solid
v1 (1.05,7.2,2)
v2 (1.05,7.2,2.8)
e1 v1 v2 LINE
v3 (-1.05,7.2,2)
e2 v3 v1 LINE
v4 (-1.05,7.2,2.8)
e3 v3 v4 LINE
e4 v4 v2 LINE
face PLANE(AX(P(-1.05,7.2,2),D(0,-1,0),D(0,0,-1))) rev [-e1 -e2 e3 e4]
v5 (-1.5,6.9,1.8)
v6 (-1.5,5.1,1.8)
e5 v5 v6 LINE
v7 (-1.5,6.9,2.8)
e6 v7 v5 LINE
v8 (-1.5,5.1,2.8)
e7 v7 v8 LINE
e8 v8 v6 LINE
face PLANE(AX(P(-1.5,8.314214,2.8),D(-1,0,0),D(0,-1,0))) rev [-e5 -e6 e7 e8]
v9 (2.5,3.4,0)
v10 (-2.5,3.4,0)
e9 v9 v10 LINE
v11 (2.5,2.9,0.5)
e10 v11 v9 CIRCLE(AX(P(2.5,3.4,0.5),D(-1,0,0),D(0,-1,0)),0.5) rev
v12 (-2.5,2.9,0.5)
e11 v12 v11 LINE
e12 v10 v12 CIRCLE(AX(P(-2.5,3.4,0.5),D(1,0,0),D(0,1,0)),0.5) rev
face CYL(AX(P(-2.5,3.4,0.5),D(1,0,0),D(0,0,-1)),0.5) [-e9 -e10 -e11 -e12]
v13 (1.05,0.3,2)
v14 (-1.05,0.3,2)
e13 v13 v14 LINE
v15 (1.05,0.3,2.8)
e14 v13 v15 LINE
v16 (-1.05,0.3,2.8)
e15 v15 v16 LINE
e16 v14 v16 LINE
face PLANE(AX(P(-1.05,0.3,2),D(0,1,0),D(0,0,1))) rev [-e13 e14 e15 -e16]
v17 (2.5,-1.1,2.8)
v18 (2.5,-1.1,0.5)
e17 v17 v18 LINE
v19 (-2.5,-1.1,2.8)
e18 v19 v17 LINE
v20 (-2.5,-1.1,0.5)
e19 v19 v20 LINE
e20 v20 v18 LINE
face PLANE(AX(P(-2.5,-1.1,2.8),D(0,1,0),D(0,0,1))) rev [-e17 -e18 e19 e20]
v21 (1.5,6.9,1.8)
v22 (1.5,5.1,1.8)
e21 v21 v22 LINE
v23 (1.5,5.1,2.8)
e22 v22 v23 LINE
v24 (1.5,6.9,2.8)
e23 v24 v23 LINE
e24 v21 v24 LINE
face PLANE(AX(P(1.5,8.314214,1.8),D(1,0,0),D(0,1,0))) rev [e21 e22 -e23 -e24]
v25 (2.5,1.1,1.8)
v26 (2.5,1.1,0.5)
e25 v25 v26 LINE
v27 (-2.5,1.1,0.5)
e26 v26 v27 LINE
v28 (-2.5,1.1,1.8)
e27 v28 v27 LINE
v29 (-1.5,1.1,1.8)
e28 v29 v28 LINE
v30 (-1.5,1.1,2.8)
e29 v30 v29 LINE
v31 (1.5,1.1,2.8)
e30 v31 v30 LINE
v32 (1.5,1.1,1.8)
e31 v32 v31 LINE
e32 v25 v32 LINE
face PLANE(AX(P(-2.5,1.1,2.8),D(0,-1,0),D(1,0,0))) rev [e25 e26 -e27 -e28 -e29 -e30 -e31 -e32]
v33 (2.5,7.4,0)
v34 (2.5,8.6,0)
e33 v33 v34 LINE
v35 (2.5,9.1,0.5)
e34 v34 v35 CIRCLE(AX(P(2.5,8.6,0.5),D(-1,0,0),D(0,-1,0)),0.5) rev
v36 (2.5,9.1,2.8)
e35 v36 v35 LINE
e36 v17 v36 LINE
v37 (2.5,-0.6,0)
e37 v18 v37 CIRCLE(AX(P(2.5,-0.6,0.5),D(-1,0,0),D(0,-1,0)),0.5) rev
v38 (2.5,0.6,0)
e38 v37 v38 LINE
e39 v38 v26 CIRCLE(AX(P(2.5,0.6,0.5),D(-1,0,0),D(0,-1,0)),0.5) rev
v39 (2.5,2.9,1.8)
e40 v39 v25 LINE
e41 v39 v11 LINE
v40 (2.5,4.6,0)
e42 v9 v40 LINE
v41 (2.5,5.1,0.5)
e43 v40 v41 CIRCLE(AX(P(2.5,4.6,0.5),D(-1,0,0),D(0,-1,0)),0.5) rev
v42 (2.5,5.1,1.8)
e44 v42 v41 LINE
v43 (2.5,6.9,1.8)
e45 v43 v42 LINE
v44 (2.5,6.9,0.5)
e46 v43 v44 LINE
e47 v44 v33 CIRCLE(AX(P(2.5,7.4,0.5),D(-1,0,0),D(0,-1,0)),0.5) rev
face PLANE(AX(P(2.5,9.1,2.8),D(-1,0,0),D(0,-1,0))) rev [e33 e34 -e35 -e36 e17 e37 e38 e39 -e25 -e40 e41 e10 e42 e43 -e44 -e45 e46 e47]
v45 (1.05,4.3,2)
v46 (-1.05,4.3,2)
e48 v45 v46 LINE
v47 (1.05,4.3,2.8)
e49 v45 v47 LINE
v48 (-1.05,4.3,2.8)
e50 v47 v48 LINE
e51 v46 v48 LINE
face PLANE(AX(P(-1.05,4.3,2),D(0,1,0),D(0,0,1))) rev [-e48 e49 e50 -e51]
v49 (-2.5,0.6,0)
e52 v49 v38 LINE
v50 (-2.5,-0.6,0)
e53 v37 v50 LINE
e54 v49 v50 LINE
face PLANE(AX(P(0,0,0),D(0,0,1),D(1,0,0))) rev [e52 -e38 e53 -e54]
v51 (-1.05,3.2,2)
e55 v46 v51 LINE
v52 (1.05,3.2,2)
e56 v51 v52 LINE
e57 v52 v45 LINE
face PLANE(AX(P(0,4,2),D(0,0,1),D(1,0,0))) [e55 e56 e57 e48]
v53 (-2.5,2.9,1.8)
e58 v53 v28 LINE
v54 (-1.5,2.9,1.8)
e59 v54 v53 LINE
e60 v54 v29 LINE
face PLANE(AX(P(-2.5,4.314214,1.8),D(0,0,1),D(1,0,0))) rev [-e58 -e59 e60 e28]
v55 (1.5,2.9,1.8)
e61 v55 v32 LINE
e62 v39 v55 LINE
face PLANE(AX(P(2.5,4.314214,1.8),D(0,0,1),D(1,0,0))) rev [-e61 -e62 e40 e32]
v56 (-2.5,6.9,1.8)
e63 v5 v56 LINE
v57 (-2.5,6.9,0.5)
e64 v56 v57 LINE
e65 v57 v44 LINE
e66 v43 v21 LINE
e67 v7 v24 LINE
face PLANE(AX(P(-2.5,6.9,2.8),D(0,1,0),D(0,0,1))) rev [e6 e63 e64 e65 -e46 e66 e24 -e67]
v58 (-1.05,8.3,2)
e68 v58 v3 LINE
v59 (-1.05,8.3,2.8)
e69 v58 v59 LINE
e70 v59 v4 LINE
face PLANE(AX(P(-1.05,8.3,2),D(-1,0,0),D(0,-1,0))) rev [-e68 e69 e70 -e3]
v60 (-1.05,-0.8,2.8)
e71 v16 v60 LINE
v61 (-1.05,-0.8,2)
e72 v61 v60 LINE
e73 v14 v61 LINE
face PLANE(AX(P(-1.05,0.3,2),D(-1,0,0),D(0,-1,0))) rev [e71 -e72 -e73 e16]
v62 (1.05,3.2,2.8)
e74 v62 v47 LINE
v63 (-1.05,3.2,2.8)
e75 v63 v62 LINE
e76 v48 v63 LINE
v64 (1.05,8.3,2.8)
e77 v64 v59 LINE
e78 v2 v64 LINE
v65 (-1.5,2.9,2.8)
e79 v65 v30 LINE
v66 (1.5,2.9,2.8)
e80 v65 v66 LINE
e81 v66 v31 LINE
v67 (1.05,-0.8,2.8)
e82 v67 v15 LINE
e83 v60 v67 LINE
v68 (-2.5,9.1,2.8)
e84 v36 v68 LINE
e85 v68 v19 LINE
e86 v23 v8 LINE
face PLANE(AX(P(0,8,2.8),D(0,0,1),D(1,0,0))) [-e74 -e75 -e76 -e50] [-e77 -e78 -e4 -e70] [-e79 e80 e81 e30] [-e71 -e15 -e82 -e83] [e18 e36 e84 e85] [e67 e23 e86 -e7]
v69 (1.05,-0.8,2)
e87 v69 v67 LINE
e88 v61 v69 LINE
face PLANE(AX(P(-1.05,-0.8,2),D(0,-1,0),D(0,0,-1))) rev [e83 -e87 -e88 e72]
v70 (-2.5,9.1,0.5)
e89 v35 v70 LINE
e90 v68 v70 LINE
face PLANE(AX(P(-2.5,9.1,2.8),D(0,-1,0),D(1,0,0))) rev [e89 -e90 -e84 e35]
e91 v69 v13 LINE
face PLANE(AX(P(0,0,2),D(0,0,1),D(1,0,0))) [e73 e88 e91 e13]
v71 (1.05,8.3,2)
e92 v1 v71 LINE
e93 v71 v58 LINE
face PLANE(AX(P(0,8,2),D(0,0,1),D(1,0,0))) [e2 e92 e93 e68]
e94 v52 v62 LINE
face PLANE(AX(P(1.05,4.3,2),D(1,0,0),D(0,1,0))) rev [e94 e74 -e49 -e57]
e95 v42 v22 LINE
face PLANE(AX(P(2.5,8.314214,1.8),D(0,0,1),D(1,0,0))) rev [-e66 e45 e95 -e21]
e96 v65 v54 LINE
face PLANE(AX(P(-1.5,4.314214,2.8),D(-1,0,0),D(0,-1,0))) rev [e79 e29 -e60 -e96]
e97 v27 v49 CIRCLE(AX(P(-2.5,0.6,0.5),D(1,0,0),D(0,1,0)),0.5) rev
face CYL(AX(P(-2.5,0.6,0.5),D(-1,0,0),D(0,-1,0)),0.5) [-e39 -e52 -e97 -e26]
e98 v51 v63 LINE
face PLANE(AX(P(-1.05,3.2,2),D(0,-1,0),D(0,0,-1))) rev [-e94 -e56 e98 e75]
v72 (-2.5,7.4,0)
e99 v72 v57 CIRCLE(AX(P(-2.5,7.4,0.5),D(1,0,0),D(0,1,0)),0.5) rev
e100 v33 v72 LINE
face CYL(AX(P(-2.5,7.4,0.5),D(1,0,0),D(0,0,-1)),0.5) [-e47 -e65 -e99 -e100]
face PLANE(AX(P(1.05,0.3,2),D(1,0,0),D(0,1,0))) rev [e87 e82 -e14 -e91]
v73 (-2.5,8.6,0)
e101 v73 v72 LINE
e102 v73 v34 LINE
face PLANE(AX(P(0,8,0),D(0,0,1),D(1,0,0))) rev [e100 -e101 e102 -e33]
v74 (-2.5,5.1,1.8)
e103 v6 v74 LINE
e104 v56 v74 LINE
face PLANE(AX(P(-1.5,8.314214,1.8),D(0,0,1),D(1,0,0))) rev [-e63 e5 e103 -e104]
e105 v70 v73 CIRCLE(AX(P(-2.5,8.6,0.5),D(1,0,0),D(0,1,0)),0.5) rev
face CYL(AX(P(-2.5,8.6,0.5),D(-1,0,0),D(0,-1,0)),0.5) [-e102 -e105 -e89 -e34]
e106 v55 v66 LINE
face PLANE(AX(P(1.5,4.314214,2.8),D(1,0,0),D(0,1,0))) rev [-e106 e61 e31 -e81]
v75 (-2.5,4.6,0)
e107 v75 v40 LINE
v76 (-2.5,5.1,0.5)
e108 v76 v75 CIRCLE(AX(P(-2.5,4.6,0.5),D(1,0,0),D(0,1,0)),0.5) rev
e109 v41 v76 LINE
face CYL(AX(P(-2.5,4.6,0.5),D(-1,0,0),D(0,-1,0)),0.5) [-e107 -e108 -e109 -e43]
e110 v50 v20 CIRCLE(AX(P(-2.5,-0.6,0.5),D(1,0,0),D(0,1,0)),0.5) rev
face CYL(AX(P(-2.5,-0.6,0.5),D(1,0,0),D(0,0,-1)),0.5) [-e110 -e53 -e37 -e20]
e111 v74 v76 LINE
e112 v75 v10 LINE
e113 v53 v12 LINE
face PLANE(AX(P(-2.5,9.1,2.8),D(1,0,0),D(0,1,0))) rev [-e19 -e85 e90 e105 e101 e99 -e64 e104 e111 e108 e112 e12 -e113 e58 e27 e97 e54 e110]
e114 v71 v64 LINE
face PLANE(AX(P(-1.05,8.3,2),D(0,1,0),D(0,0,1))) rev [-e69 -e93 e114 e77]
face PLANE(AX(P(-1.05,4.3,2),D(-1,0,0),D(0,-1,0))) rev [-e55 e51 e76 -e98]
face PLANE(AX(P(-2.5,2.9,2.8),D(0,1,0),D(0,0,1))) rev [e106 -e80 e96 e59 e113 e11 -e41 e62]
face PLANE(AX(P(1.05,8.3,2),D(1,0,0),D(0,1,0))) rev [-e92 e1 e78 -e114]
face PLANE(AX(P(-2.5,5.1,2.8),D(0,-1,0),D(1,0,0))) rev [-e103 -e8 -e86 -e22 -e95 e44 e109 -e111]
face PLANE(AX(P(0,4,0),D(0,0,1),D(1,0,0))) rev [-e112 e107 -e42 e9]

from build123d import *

# Parameters (mm, degrees)
SKETCH_1_W              = 5
SKETCH_1_H              = 2.2
EXTRUDE_1_DEPTH         = 2.8
SKETCH_2_W              = 2.1
SKETCH_2_H              = 1.1
CUT_EXTRUDE_1_DEPTH     = 0.8
FILLET_1_R              = 0.5
MOVE_START              = -2.5
MOVE_BODY_1_DEPTH       = 5
MOVE_BODY_1_2_OUTLINE_W = 1.1
MOVE_BODY_1_2_OUTLINE_H = 0.8
MOVE_BODY_1_2_DEPTH     = 1.45
MOVE_START_2            = 1.05
MOVE_BODY_1_3_OUTLINE_W = 1.1
MOVE_BODY_1_3_OUTLINE_H = 0.8
MOVE_BODY_1_3_DEPTH     = 1.45
MOVE_BODY_1_4_DEPTH     = 5
MOVE_BODY_1_5_OUTLINE_W = 1.1
MOVE_BODY_1_5_OUTLINE_H = 0.8
MOVE_BODY_1_5_DEPTH     = 1.45
MOVE_BODY_1_6_OUTLINE_W = 1.1
MOVE_BODY_1_6_OUTLINE_H = 0.8
MOVE_BODY_1_6_DEPTH     = 1.45
SKETCH_3_W              = 1
SKETCH_3_H              = 1
EXTRUDE_2_DEPTH         = 1.8
SKETCH_4_W              = 1
SKETCH_4_H              = 1
EXTRUDE_3_DEPTH         = 1.8


# Read off the part's stored shape, not the designer's step: 实体-移动/复制1
with BuildPart() as part:
    # 草图1 → 凸台-拉伸1 (new body)
    with BuildSketch(Plane.XY):
        Rectangle(SKETCH_1_W, SKETCH_1_H)
    extrude(amount=EXTRUDE_1_DEPTH)

    # 草图2 → 切除-拉伸1 (cut)
    with BuildSketch(Plane.XY.offset(2.8)):
        with Locations((0, -0.25)):
            Rectangle(SKETCH_2_W, SKETCH_2_H)
    extrude(amount=-CUT_EXTRUDE_1_DEPTH, mode=Mode.SUBTRACT)

    # 圆角1
    fillet_1_edges = [part.edges().sort_by_distance(p)[0] for p in [
        (0, -1.1, 0),
        (0, 1.1, 0),
    ]]
    fillet(fillet_1_edges, radius=FILLET_1_R)



with BuildPart() as body_2:
    # Move Body 1 outline → Move Body 1 (new body)
    with BuildSketch(Plane.YZ.offset(MOVE_START)):
        with BuildLine():
            Line((9.1, 0.5), (9.1, 2.8))
            Line((9.1, 2.8), (8.3, 2.8))
            Line((8.3, 2.8), (8.3, 2))
            Line((8.3, 2), (7.2, 2))
            Line((7.2, 2), (7.2, 2.8))
            Line((7.2, 2.8), (6.9, 2.8))
            Line((6.9, 2.8), (6.9, 0.5))
            ThreePointArc((6.9, 0.5), (7.046446609, 0.146446609), (7.4, 0))
            Line((7.4, 0), (8.6, 0))
            ThreePointArc((8.6, 0), (8.953553391, 0.146446609), (9.1, 0.5))
        make_face()
    extrude(amount=MOVE_BODY_1_DEPTH)

    # Move Body 1 2 outline → Move Body 1 2 (add)
    with BuildSketch(Plane.YZ.offset(MOVE_START)):
        with Locations((7.75, 2.4)):
            Rectangle(MOVE_BODY_1_2_OUTLINE_W, MOVE_BODY_1_2_OUTLINE_H)
    extrude(amount=MOVE_BODY_1_2_DEPTH)

    # Move Body 1 3 outline → Move Body 1 3 (add)
    with BuildSketch(Plane.YZ.offset(MOVE_START_2)):
        with Locations((7.75, 2.4)):
            Rectangle(MOVE_BODY_1_3_OUTLINE_W, MOVE_BODY_1_3_OUTLINE_H)
    extrude(amount=MOVE_BODY_1_3_DEPTH)


with BuildPart() as body_3:
    # Move Body 1 4 outline → Move Body 1 4 (new body)
    with BuildSketch(Plane.YZ.offset(MOVE_START)):
        with BuildLine():
            Line((5.1, 0.5), (5.1, 2.8))
            Line((5.1, 2.8), (4.3, 2.8))
            Line((4.3, 2.8), (4.3, 2))
            Line((4.3, 2), (3.2, 2))
            Line((3.2, 2), (3.2, 2.8))
            Line((3.2, 2.8), (2.9, 2.8))
            Line((2.9, 2.8), (2.9, 0.5))
            ThreePointArc((2.9, 0.5), (3.046446609, 0.146446609), (3.4, 0))
            Line((3.4, 0), (4.6, 0))
            ThreePointArc((4.6, 0), (4.953553391, 0.146446609), (5.1, 0.5))
        make_face()
    extrude(amount=MOVE_BODY_1_4_DEPTH)

    # Move Body 1 5 outline → Move Body 1 5 (add)
    with BuildSketch(Plane.YZ.offset(MOVE_START)):
        with Locations((3.75, 2.4)):
            Rectangle(MOVE_BODY_1_5_OUTLINE_W, MOVE_BODY_1_5_OUTLINE_H)
    extrude(amount=MOVE_BODY_1_5_DEPTH)

    # Move Body 1 6 outline → Move Body 1 6 (add)
    with BuildSketch(Plane.YZ.offset(MOVE_START_2)):
        with Locations((3.75, 2.4)):
            Rectangle(MOVE_BODY_1_6_OUTLINE_W, MOVE_BODY_1_6_OUTLINE_H)
    extrude(amount=MOVE_BODY_1_6_DEPTH)


with BuildPart() as part_1:
    add(part.part)

    add(body_3.part)  # 凸台-拉伸2 merges body 3
    # 草图3 → 凸台-拉伸2 (add)
    with BuildSketch(Plane(origin=(0, 1.1, 0), x_dir=(1, 0, 0), z_dir=(0, 1, 0))):
        with Locations((-2, -2.3)):
            Rectangle(SKETCH_3_W, SKETCH_3_H)
        with Locations((2, -2.3)):
            Rectangle(SKETCH_3_W, SKETCH_3_H)
    extrude(amount=EXTRUDE_2_DEPTH)


    add(body_2.part)  # 凸台-拉伸3 merges body 2
    # 草图4 → 凸台-拉伸3 (add)
    with BuildSketch(Plane(origin=(0, 5.1, 0), x_dir=(1, 0, 0), z_dir=(0, 1, 0))):
        with Locations((2, -2.3)):
            Rectangle(SKETCH_4_W, SKETCH_4_H)
        with Locations((-2, -2.3)):
            Rectangle(SKETCH_4_W, SKETCH_4_H)
    extrude(amount=EXTRUDE_3_DEPTH)


solid = part_1.part
